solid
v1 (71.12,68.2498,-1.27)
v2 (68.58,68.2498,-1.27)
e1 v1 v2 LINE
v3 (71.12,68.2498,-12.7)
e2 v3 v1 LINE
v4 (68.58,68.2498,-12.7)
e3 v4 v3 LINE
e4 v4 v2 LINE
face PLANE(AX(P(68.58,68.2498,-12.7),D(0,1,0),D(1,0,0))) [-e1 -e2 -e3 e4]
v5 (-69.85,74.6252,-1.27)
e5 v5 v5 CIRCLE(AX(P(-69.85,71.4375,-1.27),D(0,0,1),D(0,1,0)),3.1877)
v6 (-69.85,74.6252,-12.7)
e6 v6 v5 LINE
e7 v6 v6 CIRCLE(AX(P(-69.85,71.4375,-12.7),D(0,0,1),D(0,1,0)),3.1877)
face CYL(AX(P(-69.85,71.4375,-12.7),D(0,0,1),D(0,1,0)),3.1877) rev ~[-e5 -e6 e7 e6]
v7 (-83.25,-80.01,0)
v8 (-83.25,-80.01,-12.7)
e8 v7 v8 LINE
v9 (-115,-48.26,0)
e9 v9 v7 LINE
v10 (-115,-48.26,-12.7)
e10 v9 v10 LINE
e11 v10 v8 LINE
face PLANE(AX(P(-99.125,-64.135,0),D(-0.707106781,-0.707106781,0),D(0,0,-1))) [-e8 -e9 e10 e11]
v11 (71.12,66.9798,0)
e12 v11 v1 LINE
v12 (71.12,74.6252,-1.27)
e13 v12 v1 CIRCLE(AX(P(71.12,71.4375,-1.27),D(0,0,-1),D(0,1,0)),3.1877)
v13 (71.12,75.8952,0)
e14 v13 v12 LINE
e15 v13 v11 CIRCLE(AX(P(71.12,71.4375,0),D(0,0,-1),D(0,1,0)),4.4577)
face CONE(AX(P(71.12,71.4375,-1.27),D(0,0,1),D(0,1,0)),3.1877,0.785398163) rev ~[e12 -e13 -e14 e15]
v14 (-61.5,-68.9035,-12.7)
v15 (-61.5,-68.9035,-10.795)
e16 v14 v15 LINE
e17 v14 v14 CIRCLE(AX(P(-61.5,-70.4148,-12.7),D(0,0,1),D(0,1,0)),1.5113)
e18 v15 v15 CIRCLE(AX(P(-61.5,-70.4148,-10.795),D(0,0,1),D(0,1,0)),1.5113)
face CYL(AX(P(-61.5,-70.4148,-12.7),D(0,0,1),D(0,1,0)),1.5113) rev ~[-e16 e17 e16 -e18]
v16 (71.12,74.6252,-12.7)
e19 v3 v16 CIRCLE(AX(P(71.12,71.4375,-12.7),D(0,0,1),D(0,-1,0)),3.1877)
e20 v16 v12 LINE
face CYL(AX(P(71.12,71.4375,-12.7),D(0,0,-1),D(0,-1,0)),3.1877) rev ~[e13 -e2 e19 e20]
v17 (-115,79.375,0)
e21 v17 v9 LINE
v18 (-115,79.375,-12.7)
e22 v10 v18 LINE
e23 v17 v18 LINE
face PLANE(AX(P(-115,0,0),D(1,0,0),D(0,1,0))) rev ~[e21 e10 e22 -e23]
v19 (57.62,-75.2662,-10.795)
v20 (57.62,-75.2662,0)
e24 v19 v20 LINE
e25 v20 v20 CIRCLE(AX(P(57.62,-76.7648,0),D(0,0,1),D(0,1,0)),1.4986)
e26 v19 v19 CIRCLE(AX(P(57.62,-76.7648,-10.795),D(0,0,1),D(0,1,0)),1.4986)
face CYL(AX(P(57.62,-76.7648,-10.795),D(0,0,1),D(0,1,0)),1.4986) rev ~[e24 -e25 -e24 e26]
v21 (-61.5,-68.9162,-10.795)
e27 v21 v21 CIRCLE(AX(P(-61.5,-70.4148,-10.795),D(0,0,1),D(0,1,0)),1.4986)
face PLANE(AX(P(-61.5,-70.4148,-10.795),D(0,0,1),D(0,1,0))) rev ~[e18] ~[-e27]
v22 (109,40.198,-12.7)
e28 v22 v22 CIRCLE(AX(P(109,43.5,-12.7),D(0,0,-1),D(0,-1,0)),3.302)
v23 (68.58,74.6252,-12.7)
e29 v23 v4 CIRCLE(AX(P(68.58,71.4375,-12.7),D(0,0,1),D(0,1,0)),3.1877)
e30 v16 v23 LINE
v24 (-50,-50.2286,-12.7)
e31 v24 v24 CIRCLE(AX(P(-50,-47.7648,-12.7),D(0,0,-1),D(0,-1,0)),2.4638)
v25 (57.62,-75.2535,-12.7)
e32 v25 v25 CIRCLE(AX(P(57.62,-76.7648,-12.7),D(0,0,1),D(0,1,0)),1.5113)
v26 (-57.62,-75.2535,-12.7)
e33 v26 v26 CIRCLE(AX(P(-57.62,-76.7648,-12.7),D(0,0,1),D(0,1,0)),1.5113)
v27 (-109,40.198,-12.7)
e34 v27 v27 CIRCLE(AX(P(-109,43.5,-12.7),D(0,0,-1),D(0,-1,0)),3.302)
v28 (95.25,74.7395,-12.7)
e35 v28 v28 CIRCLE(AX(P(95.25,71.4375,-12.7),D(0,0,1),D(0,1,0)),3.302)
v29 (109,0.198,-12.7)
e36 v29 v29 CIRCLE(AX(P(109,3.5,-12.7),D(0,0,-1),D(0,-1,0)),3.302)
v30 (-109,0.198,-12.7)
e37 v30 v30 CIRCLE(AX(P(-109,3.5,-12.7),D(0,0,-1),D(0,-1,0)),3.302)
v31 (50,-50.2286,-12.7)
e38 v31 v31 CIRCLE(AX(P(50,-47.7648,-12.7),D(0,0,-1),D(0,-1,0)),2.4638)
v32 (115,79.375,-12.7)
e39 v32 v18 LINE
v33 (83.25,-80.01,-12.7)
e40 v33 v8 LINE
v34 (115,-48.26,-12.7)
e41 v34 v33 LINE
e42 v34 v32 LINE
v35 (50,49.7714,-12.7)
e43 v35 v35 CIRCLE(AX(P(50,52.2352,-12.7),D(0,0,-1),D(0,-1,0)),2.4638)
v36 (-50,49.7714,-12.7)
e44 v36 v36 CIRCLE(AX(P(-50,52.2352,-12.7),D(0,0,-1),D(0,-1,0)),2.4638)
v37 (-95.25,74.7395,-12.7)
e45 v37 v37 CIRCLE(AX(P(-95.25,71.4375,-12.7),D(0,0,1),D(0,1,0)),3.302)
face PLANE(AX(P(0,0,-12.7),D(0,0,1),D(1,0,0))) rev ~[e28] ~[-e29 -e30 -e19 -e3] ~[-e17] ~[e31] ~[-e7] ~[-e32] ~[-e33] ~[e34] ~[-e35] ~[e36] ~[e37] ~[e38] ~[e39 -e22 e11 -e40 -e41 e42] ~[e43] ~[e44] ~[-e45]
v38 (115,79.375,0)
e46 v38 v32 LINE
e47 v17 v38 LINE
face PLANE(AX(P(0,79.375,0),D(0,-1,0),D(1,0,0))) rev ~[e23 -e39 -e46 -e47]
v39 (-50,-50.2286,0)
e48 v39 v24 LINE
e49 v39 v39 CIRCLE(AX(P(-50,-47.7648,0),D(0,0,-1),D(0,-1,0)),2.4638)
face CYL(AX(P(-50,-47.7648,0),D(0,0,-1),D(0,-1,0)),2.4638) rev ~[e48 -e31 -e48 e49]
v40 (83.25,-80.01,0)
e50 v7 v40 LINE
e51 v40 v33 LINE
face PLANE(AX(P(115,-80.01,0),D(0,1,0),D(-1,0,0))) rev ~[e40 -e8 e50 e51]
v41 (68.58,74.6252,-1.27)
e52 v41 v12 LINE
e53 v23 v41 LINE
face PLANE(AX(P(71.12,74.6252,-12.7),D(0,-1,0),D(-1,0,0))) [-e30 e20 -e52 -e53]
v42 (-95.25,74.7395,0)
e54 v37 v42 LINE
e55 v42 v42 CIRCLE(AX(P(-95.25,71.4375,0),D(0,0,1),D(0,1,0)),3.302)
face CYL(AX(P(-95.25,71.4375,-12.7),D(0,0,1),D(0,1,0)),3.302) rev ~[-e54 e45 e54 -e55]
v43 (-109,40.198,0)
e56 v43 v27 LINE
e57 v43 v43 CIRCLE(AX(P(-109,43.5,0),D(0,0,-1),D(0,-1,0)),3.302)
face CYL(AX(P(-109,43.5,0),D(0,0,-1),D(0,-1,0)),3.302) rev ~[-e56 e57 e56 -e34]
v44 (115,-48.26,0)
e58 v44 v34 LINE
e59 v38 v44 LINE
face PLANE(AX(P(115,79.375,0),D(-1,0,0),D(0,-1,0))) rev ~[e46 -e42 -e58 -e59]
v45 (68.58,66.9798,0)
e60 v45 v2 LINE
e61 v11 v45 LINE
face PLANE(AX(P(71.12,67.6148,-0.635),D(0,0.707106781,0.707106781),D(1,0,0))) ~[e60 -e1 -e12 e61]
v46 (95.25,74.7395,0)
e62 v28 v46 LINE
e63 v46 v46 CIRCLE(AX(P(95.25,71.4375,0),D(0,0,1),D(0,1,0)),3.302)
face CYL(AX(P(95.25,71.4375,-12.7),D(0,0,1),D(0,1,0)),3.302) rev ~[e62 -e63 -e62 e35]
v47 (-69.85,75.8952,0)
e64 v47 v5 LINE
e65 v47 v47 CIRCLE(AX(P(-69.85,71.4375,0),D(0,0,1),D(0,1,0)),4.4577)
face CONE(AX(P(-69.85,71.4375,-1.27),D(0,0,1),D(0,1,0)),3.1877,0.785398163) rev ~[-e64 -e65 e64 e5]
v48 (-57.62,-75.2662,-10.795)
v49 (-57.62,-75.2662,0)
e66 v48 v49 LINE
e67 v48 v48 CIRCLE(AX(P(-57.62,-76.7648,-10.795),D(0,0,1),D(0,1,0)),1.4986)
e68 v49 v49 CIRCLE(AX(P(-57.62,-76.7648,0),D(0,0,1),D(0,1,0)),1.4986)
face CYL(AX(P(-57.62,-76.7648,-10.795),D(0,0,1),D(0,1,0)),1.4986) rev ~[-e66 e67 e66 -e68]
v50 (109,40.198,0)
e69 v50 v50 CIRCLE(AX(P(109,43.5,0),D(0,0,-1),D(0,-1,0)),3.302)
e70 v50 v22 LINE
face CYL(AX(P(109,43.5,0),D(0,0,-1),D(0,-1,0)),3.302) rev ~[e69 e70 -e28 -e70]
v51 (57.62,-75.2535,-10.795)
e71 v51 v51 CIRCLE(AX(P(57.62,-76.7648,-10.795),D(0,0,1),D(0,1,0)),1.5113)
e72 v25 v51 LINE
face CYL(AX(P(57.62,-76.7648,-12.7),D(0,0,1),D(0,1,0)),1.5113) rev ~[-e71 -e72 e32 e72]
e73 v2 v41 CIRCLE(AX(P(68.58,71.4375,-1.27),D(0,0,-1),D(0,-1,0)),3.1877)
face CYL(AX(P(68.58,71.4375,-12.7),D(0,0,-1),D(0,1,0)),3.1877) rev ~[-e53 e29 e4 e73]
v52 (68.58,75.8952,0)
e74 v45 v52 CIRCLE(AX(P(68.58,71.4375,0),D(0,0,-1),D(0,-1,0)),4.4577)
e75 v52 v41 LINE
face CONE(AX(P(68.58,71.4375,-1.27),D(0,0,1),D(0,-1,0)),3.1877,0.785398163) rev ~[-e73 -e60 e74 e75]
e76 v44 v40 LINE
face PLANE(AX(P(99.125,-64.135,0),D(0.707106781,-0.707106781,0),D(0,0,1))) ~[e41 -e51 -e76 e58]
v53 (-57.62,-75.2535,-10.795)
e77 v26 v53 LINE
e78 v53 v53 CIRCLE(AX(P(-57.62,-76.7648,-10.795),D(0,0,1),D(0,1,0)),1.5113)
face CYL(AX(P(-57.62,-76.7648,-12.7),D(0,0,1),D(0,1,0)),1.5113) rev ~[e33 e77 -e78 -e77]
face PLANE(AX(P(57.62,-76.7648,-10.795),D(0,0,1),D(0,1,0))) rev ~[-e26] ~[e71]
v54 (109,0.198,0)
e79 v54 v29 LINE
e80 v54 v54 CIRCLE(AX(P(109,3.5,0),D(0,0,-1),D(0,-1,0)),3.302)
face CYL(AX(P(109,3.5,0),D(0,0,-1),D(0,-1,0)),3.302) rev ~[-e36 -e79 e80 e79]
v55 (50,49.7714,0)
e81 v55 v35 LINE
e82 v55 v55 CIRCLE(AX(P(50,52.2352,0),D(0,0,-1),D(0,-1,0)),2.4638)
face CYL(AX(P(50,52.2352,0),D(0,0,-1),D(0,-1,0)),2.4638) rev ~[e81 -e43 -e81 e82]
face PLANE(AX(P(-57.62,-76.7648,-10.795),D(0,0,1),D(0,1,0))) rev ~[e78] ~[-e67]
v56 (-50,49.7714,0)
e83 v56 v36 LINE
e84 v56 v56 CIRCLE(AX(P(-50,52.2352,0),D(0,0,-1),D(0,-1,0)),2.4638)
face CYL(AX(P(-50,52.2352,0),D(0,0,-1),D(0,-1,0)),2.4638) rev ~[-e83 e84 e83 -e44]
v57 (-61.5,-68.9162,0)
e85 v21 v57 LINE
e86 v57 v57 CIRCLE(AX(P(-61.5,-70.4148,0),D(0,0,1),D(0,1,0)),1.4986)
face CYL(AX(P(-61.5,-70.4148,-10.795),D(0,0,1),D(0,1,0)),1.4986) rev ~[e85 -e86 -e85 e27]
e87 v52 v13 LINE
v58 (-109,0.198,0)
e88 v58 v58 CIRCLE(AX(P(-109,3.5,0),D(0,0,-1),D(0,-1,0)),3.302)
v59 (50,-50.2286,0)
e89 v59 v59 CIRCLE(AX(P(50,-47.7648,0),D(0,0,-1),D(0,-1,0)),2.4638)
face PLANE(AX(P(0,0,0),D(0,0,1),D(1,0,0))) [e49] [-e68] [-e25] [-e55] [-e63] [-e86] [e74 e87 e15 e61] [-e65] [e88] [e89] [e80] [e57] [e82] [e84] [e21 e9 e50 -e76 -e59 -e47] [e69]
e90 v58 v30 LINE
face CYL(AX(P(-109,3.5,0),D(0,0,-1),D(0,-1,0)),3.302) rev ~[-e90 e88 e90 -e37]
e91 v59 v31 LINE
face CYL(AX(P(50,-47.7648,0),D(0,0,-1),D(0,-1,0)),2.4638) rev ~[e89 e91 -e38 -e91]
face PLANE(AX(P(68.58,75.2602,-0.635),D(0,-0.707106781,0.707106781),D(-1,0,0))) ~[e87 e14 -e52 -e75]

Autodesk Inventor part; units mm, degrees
ref_plane "YZ Plane" through (0, 0, 0) normal (1, 0, 0) x (0, 1, 0)
ref_plane "XZ Plane" through (0, 0, 0) normal (0, 1, 0) x (-1, 0, 0)
ref_plane "XY Plane" through (0, 0, 0) normal (0, 0, 1) x (1, 0, 0)
sketch "Sketch1" plane through (0, 0, 0) normal (0, 0, 1) x (1, 0, 0)
  line L0 (0, 111.252) -> (0, -111.887) projected
  line L1 (-161, 0) -> (161, 0) projected
  line L2 (115, -80.01) -> (-115, -80.01)
  line L3 (-115, -80.01) -> (-115, 79.375)
  line L4 (-115, 79.375) -> (115, 79.375)
  line L5 (115, 79.375) -> (115, -80.01)
  line L6 (50, -47.7648) -> (-50, -47.7648) construction
  line L7 (-50, -47.7648) -> (-50, 52.2352) construction
  line L8 (-50, 52.2352) -> (50, 52.2352) construction
  line L9 (50, 52.2352) -> (50, -47.7648) construction
  line L10 (50, -47.7648) -> (-50, 52.2352) construction
  line L11 (-50, -47.7648) -> (50, 52.2352) construction
  line L12 (109, 3.5) -> (-109, 3.5) construction
  line L13 (-109, 3.5) -> (-109, 43.5) construction
  line L14 (-109, 43.5) -> (109, 43.5) construction
  line L15 (109, 43.5) -> (109, 3.5) construction
  line L16 (109, 3.5) -> (-109, 43.5) construction
  line L17 (-109, 3.5) -> (109, 43.5) construction
  point P0 (0, 2.2352)
  point P1 (0, 23.5)
  point P2 (-57.62, -76.7648)
  point P3 (57.62, -76.7648)
  dimension "d0" = 230
  dimension "d1" = 159.385
  dimension "d4" = 100
  dimension "d5" = 100
  dimension "d28" = 35.875
  dimension "d29" = 40
  dimension "d30" = 6
  dimension "d38" = 29
  dimension "d39" = 79.375
  dimension "d40" = 115
  dimension "d48" = 2.2352
  dimension "d52" = 7.62
  dimension "d53" = 7.62
extrude "Extrusion1" add sketch "Sketch1" against normal blind 12.7
hole "Hole1" at (-50, 52.2352, 0) at (50, 52.2352, 0) at (50, -47.7648, 0) at (-50, -47.7648, 0) direction (0, 0, -1) diameter 4.9276 end through all
hole "Hole3" at (-109, 43.5, 0) at (-109, 3.5, 0) at (109, 3.5, 0) at (109, 43.5, 0) direction (0, 0, -1) diameter 6.604 end through all clearance for "Socket Head Cap Screw" size "M6" standard "Ansi Metric M Profile"
chamfer "Chamfer1" distance 31.75 angle 45 2 edges at (-115, -80.01, -6.35) (115, -80.01, -6.35)
sketch "Sketch3" plane through (0, 0, -12.7) normal (0, 0, 1) x (1, 0, 0)
  line L0 (-95.25, 71.4375) -> (95.25, 71.4375) construction
  line L1 (0, 111.252) -> (0, -111.887) construction
  line L2 (-161, 0) -> (161, 0) construction
  line L3 (71.12, 71.4375) -> (68.58, 71.4375) construction
  line L4 (71.12, 74.6252) -> (68.58, 74.6252)
  line L5 (68.58, 68.2498) -> (71.12, 68.2498)
  arc A0 (71.12, 68.2498) -> (71.12, 74.6252) centre (71.12, 71.4375) ccw
  arc A1 (68.58, 74.6252) -> (68.58, 68.2498) centre (68.58, 71.4375) ccw
  line L6 (-115, 79.375) -> (115, 79.375) projected
  point P0 (0, 0)
  point P1 (-69.85, 71.4375)
  point P2 (69.85, 71.4375)
  dimension "d54" = 95.25
  dimension "d55" = 69.85
  dimension "d56" = 69.85
  dimension "d57" = 95.25
  dimension "d58" = 2.54
  dimension "d59" = 6.3754
  dimension "d69" = 7.9375
extrude "Extrusion3" cut sketch "Sketch3" along normal up to next
hole "Hole7" at (-69.85, 71.4375, -12.7) direction (0, 0, 1) diameter 6.3754 end through all
hole "Hole8" at (95.25, 71.4375, -12.7) at (-95.25, 71.4375, -12.7) direction (0, 0, 1) diameter 6.604 end through all clearance for "Socket Head Cap Screw" size "M6" standard "Ansi Metric M Profile"
chamfer "Chamfer3" distance 1.27 angle 45 5 edges at (-69.85, 68.2498, 0) (65.3923, 71.4375, 0) (69.85, 74.6252, 0) (74.3077, 71.4375, 0) (69.85, 68.2498, 0)
sketch "Sketch4" plane through (0, 0, -12.7) normal (0, 0, -1) x (-1, 0, 0)
  line L0 (0, -111.887) -> (0, 111.252) projected
  line L1 (-161, 0) -> (161, 0) projected
  line L2 (60, -77.854) -> (-60, -77.854) construction
  line L3 (-60, -77.854) -> (-60, 77.854) construction
  line L4 (-60, 77.854) -> (60, 77.854) construction
  line L5 (60, 77.854) -> (60, -77.854) construction
  line L6 (60, -77.854) -> (-60, 77.854) construction
  line L7 (-60, -77.854) -> (60, 77.854) construction
  circle A0 centre (61.5, -70.4148) radius 1.5 construction
  point P0 (0, 0)
  point P1 (-57.62, -76.7648)
  point P2 (57.62, -76.7648)
  dimension "d106" = 120
  dimension "d107" = 3
  dimension "d108" = 6.35
hole "Hole9" at (57.62, -76.7648, -12.7) at (-57.62, -76.7648, -12.7) at (-61.5, -70.4148, -12.7) direction (0, 0, 1) diameter 2.9972 end through all counterbore diameter 3.0226 counterbore depth 1.905
equation "\"d40\" = 0.5 * d0"
equation "\"d56\" = d55"
equation "\"d57\" = d54"
properties part number "J008086" material "ALUMINUM, 6061-T651"
